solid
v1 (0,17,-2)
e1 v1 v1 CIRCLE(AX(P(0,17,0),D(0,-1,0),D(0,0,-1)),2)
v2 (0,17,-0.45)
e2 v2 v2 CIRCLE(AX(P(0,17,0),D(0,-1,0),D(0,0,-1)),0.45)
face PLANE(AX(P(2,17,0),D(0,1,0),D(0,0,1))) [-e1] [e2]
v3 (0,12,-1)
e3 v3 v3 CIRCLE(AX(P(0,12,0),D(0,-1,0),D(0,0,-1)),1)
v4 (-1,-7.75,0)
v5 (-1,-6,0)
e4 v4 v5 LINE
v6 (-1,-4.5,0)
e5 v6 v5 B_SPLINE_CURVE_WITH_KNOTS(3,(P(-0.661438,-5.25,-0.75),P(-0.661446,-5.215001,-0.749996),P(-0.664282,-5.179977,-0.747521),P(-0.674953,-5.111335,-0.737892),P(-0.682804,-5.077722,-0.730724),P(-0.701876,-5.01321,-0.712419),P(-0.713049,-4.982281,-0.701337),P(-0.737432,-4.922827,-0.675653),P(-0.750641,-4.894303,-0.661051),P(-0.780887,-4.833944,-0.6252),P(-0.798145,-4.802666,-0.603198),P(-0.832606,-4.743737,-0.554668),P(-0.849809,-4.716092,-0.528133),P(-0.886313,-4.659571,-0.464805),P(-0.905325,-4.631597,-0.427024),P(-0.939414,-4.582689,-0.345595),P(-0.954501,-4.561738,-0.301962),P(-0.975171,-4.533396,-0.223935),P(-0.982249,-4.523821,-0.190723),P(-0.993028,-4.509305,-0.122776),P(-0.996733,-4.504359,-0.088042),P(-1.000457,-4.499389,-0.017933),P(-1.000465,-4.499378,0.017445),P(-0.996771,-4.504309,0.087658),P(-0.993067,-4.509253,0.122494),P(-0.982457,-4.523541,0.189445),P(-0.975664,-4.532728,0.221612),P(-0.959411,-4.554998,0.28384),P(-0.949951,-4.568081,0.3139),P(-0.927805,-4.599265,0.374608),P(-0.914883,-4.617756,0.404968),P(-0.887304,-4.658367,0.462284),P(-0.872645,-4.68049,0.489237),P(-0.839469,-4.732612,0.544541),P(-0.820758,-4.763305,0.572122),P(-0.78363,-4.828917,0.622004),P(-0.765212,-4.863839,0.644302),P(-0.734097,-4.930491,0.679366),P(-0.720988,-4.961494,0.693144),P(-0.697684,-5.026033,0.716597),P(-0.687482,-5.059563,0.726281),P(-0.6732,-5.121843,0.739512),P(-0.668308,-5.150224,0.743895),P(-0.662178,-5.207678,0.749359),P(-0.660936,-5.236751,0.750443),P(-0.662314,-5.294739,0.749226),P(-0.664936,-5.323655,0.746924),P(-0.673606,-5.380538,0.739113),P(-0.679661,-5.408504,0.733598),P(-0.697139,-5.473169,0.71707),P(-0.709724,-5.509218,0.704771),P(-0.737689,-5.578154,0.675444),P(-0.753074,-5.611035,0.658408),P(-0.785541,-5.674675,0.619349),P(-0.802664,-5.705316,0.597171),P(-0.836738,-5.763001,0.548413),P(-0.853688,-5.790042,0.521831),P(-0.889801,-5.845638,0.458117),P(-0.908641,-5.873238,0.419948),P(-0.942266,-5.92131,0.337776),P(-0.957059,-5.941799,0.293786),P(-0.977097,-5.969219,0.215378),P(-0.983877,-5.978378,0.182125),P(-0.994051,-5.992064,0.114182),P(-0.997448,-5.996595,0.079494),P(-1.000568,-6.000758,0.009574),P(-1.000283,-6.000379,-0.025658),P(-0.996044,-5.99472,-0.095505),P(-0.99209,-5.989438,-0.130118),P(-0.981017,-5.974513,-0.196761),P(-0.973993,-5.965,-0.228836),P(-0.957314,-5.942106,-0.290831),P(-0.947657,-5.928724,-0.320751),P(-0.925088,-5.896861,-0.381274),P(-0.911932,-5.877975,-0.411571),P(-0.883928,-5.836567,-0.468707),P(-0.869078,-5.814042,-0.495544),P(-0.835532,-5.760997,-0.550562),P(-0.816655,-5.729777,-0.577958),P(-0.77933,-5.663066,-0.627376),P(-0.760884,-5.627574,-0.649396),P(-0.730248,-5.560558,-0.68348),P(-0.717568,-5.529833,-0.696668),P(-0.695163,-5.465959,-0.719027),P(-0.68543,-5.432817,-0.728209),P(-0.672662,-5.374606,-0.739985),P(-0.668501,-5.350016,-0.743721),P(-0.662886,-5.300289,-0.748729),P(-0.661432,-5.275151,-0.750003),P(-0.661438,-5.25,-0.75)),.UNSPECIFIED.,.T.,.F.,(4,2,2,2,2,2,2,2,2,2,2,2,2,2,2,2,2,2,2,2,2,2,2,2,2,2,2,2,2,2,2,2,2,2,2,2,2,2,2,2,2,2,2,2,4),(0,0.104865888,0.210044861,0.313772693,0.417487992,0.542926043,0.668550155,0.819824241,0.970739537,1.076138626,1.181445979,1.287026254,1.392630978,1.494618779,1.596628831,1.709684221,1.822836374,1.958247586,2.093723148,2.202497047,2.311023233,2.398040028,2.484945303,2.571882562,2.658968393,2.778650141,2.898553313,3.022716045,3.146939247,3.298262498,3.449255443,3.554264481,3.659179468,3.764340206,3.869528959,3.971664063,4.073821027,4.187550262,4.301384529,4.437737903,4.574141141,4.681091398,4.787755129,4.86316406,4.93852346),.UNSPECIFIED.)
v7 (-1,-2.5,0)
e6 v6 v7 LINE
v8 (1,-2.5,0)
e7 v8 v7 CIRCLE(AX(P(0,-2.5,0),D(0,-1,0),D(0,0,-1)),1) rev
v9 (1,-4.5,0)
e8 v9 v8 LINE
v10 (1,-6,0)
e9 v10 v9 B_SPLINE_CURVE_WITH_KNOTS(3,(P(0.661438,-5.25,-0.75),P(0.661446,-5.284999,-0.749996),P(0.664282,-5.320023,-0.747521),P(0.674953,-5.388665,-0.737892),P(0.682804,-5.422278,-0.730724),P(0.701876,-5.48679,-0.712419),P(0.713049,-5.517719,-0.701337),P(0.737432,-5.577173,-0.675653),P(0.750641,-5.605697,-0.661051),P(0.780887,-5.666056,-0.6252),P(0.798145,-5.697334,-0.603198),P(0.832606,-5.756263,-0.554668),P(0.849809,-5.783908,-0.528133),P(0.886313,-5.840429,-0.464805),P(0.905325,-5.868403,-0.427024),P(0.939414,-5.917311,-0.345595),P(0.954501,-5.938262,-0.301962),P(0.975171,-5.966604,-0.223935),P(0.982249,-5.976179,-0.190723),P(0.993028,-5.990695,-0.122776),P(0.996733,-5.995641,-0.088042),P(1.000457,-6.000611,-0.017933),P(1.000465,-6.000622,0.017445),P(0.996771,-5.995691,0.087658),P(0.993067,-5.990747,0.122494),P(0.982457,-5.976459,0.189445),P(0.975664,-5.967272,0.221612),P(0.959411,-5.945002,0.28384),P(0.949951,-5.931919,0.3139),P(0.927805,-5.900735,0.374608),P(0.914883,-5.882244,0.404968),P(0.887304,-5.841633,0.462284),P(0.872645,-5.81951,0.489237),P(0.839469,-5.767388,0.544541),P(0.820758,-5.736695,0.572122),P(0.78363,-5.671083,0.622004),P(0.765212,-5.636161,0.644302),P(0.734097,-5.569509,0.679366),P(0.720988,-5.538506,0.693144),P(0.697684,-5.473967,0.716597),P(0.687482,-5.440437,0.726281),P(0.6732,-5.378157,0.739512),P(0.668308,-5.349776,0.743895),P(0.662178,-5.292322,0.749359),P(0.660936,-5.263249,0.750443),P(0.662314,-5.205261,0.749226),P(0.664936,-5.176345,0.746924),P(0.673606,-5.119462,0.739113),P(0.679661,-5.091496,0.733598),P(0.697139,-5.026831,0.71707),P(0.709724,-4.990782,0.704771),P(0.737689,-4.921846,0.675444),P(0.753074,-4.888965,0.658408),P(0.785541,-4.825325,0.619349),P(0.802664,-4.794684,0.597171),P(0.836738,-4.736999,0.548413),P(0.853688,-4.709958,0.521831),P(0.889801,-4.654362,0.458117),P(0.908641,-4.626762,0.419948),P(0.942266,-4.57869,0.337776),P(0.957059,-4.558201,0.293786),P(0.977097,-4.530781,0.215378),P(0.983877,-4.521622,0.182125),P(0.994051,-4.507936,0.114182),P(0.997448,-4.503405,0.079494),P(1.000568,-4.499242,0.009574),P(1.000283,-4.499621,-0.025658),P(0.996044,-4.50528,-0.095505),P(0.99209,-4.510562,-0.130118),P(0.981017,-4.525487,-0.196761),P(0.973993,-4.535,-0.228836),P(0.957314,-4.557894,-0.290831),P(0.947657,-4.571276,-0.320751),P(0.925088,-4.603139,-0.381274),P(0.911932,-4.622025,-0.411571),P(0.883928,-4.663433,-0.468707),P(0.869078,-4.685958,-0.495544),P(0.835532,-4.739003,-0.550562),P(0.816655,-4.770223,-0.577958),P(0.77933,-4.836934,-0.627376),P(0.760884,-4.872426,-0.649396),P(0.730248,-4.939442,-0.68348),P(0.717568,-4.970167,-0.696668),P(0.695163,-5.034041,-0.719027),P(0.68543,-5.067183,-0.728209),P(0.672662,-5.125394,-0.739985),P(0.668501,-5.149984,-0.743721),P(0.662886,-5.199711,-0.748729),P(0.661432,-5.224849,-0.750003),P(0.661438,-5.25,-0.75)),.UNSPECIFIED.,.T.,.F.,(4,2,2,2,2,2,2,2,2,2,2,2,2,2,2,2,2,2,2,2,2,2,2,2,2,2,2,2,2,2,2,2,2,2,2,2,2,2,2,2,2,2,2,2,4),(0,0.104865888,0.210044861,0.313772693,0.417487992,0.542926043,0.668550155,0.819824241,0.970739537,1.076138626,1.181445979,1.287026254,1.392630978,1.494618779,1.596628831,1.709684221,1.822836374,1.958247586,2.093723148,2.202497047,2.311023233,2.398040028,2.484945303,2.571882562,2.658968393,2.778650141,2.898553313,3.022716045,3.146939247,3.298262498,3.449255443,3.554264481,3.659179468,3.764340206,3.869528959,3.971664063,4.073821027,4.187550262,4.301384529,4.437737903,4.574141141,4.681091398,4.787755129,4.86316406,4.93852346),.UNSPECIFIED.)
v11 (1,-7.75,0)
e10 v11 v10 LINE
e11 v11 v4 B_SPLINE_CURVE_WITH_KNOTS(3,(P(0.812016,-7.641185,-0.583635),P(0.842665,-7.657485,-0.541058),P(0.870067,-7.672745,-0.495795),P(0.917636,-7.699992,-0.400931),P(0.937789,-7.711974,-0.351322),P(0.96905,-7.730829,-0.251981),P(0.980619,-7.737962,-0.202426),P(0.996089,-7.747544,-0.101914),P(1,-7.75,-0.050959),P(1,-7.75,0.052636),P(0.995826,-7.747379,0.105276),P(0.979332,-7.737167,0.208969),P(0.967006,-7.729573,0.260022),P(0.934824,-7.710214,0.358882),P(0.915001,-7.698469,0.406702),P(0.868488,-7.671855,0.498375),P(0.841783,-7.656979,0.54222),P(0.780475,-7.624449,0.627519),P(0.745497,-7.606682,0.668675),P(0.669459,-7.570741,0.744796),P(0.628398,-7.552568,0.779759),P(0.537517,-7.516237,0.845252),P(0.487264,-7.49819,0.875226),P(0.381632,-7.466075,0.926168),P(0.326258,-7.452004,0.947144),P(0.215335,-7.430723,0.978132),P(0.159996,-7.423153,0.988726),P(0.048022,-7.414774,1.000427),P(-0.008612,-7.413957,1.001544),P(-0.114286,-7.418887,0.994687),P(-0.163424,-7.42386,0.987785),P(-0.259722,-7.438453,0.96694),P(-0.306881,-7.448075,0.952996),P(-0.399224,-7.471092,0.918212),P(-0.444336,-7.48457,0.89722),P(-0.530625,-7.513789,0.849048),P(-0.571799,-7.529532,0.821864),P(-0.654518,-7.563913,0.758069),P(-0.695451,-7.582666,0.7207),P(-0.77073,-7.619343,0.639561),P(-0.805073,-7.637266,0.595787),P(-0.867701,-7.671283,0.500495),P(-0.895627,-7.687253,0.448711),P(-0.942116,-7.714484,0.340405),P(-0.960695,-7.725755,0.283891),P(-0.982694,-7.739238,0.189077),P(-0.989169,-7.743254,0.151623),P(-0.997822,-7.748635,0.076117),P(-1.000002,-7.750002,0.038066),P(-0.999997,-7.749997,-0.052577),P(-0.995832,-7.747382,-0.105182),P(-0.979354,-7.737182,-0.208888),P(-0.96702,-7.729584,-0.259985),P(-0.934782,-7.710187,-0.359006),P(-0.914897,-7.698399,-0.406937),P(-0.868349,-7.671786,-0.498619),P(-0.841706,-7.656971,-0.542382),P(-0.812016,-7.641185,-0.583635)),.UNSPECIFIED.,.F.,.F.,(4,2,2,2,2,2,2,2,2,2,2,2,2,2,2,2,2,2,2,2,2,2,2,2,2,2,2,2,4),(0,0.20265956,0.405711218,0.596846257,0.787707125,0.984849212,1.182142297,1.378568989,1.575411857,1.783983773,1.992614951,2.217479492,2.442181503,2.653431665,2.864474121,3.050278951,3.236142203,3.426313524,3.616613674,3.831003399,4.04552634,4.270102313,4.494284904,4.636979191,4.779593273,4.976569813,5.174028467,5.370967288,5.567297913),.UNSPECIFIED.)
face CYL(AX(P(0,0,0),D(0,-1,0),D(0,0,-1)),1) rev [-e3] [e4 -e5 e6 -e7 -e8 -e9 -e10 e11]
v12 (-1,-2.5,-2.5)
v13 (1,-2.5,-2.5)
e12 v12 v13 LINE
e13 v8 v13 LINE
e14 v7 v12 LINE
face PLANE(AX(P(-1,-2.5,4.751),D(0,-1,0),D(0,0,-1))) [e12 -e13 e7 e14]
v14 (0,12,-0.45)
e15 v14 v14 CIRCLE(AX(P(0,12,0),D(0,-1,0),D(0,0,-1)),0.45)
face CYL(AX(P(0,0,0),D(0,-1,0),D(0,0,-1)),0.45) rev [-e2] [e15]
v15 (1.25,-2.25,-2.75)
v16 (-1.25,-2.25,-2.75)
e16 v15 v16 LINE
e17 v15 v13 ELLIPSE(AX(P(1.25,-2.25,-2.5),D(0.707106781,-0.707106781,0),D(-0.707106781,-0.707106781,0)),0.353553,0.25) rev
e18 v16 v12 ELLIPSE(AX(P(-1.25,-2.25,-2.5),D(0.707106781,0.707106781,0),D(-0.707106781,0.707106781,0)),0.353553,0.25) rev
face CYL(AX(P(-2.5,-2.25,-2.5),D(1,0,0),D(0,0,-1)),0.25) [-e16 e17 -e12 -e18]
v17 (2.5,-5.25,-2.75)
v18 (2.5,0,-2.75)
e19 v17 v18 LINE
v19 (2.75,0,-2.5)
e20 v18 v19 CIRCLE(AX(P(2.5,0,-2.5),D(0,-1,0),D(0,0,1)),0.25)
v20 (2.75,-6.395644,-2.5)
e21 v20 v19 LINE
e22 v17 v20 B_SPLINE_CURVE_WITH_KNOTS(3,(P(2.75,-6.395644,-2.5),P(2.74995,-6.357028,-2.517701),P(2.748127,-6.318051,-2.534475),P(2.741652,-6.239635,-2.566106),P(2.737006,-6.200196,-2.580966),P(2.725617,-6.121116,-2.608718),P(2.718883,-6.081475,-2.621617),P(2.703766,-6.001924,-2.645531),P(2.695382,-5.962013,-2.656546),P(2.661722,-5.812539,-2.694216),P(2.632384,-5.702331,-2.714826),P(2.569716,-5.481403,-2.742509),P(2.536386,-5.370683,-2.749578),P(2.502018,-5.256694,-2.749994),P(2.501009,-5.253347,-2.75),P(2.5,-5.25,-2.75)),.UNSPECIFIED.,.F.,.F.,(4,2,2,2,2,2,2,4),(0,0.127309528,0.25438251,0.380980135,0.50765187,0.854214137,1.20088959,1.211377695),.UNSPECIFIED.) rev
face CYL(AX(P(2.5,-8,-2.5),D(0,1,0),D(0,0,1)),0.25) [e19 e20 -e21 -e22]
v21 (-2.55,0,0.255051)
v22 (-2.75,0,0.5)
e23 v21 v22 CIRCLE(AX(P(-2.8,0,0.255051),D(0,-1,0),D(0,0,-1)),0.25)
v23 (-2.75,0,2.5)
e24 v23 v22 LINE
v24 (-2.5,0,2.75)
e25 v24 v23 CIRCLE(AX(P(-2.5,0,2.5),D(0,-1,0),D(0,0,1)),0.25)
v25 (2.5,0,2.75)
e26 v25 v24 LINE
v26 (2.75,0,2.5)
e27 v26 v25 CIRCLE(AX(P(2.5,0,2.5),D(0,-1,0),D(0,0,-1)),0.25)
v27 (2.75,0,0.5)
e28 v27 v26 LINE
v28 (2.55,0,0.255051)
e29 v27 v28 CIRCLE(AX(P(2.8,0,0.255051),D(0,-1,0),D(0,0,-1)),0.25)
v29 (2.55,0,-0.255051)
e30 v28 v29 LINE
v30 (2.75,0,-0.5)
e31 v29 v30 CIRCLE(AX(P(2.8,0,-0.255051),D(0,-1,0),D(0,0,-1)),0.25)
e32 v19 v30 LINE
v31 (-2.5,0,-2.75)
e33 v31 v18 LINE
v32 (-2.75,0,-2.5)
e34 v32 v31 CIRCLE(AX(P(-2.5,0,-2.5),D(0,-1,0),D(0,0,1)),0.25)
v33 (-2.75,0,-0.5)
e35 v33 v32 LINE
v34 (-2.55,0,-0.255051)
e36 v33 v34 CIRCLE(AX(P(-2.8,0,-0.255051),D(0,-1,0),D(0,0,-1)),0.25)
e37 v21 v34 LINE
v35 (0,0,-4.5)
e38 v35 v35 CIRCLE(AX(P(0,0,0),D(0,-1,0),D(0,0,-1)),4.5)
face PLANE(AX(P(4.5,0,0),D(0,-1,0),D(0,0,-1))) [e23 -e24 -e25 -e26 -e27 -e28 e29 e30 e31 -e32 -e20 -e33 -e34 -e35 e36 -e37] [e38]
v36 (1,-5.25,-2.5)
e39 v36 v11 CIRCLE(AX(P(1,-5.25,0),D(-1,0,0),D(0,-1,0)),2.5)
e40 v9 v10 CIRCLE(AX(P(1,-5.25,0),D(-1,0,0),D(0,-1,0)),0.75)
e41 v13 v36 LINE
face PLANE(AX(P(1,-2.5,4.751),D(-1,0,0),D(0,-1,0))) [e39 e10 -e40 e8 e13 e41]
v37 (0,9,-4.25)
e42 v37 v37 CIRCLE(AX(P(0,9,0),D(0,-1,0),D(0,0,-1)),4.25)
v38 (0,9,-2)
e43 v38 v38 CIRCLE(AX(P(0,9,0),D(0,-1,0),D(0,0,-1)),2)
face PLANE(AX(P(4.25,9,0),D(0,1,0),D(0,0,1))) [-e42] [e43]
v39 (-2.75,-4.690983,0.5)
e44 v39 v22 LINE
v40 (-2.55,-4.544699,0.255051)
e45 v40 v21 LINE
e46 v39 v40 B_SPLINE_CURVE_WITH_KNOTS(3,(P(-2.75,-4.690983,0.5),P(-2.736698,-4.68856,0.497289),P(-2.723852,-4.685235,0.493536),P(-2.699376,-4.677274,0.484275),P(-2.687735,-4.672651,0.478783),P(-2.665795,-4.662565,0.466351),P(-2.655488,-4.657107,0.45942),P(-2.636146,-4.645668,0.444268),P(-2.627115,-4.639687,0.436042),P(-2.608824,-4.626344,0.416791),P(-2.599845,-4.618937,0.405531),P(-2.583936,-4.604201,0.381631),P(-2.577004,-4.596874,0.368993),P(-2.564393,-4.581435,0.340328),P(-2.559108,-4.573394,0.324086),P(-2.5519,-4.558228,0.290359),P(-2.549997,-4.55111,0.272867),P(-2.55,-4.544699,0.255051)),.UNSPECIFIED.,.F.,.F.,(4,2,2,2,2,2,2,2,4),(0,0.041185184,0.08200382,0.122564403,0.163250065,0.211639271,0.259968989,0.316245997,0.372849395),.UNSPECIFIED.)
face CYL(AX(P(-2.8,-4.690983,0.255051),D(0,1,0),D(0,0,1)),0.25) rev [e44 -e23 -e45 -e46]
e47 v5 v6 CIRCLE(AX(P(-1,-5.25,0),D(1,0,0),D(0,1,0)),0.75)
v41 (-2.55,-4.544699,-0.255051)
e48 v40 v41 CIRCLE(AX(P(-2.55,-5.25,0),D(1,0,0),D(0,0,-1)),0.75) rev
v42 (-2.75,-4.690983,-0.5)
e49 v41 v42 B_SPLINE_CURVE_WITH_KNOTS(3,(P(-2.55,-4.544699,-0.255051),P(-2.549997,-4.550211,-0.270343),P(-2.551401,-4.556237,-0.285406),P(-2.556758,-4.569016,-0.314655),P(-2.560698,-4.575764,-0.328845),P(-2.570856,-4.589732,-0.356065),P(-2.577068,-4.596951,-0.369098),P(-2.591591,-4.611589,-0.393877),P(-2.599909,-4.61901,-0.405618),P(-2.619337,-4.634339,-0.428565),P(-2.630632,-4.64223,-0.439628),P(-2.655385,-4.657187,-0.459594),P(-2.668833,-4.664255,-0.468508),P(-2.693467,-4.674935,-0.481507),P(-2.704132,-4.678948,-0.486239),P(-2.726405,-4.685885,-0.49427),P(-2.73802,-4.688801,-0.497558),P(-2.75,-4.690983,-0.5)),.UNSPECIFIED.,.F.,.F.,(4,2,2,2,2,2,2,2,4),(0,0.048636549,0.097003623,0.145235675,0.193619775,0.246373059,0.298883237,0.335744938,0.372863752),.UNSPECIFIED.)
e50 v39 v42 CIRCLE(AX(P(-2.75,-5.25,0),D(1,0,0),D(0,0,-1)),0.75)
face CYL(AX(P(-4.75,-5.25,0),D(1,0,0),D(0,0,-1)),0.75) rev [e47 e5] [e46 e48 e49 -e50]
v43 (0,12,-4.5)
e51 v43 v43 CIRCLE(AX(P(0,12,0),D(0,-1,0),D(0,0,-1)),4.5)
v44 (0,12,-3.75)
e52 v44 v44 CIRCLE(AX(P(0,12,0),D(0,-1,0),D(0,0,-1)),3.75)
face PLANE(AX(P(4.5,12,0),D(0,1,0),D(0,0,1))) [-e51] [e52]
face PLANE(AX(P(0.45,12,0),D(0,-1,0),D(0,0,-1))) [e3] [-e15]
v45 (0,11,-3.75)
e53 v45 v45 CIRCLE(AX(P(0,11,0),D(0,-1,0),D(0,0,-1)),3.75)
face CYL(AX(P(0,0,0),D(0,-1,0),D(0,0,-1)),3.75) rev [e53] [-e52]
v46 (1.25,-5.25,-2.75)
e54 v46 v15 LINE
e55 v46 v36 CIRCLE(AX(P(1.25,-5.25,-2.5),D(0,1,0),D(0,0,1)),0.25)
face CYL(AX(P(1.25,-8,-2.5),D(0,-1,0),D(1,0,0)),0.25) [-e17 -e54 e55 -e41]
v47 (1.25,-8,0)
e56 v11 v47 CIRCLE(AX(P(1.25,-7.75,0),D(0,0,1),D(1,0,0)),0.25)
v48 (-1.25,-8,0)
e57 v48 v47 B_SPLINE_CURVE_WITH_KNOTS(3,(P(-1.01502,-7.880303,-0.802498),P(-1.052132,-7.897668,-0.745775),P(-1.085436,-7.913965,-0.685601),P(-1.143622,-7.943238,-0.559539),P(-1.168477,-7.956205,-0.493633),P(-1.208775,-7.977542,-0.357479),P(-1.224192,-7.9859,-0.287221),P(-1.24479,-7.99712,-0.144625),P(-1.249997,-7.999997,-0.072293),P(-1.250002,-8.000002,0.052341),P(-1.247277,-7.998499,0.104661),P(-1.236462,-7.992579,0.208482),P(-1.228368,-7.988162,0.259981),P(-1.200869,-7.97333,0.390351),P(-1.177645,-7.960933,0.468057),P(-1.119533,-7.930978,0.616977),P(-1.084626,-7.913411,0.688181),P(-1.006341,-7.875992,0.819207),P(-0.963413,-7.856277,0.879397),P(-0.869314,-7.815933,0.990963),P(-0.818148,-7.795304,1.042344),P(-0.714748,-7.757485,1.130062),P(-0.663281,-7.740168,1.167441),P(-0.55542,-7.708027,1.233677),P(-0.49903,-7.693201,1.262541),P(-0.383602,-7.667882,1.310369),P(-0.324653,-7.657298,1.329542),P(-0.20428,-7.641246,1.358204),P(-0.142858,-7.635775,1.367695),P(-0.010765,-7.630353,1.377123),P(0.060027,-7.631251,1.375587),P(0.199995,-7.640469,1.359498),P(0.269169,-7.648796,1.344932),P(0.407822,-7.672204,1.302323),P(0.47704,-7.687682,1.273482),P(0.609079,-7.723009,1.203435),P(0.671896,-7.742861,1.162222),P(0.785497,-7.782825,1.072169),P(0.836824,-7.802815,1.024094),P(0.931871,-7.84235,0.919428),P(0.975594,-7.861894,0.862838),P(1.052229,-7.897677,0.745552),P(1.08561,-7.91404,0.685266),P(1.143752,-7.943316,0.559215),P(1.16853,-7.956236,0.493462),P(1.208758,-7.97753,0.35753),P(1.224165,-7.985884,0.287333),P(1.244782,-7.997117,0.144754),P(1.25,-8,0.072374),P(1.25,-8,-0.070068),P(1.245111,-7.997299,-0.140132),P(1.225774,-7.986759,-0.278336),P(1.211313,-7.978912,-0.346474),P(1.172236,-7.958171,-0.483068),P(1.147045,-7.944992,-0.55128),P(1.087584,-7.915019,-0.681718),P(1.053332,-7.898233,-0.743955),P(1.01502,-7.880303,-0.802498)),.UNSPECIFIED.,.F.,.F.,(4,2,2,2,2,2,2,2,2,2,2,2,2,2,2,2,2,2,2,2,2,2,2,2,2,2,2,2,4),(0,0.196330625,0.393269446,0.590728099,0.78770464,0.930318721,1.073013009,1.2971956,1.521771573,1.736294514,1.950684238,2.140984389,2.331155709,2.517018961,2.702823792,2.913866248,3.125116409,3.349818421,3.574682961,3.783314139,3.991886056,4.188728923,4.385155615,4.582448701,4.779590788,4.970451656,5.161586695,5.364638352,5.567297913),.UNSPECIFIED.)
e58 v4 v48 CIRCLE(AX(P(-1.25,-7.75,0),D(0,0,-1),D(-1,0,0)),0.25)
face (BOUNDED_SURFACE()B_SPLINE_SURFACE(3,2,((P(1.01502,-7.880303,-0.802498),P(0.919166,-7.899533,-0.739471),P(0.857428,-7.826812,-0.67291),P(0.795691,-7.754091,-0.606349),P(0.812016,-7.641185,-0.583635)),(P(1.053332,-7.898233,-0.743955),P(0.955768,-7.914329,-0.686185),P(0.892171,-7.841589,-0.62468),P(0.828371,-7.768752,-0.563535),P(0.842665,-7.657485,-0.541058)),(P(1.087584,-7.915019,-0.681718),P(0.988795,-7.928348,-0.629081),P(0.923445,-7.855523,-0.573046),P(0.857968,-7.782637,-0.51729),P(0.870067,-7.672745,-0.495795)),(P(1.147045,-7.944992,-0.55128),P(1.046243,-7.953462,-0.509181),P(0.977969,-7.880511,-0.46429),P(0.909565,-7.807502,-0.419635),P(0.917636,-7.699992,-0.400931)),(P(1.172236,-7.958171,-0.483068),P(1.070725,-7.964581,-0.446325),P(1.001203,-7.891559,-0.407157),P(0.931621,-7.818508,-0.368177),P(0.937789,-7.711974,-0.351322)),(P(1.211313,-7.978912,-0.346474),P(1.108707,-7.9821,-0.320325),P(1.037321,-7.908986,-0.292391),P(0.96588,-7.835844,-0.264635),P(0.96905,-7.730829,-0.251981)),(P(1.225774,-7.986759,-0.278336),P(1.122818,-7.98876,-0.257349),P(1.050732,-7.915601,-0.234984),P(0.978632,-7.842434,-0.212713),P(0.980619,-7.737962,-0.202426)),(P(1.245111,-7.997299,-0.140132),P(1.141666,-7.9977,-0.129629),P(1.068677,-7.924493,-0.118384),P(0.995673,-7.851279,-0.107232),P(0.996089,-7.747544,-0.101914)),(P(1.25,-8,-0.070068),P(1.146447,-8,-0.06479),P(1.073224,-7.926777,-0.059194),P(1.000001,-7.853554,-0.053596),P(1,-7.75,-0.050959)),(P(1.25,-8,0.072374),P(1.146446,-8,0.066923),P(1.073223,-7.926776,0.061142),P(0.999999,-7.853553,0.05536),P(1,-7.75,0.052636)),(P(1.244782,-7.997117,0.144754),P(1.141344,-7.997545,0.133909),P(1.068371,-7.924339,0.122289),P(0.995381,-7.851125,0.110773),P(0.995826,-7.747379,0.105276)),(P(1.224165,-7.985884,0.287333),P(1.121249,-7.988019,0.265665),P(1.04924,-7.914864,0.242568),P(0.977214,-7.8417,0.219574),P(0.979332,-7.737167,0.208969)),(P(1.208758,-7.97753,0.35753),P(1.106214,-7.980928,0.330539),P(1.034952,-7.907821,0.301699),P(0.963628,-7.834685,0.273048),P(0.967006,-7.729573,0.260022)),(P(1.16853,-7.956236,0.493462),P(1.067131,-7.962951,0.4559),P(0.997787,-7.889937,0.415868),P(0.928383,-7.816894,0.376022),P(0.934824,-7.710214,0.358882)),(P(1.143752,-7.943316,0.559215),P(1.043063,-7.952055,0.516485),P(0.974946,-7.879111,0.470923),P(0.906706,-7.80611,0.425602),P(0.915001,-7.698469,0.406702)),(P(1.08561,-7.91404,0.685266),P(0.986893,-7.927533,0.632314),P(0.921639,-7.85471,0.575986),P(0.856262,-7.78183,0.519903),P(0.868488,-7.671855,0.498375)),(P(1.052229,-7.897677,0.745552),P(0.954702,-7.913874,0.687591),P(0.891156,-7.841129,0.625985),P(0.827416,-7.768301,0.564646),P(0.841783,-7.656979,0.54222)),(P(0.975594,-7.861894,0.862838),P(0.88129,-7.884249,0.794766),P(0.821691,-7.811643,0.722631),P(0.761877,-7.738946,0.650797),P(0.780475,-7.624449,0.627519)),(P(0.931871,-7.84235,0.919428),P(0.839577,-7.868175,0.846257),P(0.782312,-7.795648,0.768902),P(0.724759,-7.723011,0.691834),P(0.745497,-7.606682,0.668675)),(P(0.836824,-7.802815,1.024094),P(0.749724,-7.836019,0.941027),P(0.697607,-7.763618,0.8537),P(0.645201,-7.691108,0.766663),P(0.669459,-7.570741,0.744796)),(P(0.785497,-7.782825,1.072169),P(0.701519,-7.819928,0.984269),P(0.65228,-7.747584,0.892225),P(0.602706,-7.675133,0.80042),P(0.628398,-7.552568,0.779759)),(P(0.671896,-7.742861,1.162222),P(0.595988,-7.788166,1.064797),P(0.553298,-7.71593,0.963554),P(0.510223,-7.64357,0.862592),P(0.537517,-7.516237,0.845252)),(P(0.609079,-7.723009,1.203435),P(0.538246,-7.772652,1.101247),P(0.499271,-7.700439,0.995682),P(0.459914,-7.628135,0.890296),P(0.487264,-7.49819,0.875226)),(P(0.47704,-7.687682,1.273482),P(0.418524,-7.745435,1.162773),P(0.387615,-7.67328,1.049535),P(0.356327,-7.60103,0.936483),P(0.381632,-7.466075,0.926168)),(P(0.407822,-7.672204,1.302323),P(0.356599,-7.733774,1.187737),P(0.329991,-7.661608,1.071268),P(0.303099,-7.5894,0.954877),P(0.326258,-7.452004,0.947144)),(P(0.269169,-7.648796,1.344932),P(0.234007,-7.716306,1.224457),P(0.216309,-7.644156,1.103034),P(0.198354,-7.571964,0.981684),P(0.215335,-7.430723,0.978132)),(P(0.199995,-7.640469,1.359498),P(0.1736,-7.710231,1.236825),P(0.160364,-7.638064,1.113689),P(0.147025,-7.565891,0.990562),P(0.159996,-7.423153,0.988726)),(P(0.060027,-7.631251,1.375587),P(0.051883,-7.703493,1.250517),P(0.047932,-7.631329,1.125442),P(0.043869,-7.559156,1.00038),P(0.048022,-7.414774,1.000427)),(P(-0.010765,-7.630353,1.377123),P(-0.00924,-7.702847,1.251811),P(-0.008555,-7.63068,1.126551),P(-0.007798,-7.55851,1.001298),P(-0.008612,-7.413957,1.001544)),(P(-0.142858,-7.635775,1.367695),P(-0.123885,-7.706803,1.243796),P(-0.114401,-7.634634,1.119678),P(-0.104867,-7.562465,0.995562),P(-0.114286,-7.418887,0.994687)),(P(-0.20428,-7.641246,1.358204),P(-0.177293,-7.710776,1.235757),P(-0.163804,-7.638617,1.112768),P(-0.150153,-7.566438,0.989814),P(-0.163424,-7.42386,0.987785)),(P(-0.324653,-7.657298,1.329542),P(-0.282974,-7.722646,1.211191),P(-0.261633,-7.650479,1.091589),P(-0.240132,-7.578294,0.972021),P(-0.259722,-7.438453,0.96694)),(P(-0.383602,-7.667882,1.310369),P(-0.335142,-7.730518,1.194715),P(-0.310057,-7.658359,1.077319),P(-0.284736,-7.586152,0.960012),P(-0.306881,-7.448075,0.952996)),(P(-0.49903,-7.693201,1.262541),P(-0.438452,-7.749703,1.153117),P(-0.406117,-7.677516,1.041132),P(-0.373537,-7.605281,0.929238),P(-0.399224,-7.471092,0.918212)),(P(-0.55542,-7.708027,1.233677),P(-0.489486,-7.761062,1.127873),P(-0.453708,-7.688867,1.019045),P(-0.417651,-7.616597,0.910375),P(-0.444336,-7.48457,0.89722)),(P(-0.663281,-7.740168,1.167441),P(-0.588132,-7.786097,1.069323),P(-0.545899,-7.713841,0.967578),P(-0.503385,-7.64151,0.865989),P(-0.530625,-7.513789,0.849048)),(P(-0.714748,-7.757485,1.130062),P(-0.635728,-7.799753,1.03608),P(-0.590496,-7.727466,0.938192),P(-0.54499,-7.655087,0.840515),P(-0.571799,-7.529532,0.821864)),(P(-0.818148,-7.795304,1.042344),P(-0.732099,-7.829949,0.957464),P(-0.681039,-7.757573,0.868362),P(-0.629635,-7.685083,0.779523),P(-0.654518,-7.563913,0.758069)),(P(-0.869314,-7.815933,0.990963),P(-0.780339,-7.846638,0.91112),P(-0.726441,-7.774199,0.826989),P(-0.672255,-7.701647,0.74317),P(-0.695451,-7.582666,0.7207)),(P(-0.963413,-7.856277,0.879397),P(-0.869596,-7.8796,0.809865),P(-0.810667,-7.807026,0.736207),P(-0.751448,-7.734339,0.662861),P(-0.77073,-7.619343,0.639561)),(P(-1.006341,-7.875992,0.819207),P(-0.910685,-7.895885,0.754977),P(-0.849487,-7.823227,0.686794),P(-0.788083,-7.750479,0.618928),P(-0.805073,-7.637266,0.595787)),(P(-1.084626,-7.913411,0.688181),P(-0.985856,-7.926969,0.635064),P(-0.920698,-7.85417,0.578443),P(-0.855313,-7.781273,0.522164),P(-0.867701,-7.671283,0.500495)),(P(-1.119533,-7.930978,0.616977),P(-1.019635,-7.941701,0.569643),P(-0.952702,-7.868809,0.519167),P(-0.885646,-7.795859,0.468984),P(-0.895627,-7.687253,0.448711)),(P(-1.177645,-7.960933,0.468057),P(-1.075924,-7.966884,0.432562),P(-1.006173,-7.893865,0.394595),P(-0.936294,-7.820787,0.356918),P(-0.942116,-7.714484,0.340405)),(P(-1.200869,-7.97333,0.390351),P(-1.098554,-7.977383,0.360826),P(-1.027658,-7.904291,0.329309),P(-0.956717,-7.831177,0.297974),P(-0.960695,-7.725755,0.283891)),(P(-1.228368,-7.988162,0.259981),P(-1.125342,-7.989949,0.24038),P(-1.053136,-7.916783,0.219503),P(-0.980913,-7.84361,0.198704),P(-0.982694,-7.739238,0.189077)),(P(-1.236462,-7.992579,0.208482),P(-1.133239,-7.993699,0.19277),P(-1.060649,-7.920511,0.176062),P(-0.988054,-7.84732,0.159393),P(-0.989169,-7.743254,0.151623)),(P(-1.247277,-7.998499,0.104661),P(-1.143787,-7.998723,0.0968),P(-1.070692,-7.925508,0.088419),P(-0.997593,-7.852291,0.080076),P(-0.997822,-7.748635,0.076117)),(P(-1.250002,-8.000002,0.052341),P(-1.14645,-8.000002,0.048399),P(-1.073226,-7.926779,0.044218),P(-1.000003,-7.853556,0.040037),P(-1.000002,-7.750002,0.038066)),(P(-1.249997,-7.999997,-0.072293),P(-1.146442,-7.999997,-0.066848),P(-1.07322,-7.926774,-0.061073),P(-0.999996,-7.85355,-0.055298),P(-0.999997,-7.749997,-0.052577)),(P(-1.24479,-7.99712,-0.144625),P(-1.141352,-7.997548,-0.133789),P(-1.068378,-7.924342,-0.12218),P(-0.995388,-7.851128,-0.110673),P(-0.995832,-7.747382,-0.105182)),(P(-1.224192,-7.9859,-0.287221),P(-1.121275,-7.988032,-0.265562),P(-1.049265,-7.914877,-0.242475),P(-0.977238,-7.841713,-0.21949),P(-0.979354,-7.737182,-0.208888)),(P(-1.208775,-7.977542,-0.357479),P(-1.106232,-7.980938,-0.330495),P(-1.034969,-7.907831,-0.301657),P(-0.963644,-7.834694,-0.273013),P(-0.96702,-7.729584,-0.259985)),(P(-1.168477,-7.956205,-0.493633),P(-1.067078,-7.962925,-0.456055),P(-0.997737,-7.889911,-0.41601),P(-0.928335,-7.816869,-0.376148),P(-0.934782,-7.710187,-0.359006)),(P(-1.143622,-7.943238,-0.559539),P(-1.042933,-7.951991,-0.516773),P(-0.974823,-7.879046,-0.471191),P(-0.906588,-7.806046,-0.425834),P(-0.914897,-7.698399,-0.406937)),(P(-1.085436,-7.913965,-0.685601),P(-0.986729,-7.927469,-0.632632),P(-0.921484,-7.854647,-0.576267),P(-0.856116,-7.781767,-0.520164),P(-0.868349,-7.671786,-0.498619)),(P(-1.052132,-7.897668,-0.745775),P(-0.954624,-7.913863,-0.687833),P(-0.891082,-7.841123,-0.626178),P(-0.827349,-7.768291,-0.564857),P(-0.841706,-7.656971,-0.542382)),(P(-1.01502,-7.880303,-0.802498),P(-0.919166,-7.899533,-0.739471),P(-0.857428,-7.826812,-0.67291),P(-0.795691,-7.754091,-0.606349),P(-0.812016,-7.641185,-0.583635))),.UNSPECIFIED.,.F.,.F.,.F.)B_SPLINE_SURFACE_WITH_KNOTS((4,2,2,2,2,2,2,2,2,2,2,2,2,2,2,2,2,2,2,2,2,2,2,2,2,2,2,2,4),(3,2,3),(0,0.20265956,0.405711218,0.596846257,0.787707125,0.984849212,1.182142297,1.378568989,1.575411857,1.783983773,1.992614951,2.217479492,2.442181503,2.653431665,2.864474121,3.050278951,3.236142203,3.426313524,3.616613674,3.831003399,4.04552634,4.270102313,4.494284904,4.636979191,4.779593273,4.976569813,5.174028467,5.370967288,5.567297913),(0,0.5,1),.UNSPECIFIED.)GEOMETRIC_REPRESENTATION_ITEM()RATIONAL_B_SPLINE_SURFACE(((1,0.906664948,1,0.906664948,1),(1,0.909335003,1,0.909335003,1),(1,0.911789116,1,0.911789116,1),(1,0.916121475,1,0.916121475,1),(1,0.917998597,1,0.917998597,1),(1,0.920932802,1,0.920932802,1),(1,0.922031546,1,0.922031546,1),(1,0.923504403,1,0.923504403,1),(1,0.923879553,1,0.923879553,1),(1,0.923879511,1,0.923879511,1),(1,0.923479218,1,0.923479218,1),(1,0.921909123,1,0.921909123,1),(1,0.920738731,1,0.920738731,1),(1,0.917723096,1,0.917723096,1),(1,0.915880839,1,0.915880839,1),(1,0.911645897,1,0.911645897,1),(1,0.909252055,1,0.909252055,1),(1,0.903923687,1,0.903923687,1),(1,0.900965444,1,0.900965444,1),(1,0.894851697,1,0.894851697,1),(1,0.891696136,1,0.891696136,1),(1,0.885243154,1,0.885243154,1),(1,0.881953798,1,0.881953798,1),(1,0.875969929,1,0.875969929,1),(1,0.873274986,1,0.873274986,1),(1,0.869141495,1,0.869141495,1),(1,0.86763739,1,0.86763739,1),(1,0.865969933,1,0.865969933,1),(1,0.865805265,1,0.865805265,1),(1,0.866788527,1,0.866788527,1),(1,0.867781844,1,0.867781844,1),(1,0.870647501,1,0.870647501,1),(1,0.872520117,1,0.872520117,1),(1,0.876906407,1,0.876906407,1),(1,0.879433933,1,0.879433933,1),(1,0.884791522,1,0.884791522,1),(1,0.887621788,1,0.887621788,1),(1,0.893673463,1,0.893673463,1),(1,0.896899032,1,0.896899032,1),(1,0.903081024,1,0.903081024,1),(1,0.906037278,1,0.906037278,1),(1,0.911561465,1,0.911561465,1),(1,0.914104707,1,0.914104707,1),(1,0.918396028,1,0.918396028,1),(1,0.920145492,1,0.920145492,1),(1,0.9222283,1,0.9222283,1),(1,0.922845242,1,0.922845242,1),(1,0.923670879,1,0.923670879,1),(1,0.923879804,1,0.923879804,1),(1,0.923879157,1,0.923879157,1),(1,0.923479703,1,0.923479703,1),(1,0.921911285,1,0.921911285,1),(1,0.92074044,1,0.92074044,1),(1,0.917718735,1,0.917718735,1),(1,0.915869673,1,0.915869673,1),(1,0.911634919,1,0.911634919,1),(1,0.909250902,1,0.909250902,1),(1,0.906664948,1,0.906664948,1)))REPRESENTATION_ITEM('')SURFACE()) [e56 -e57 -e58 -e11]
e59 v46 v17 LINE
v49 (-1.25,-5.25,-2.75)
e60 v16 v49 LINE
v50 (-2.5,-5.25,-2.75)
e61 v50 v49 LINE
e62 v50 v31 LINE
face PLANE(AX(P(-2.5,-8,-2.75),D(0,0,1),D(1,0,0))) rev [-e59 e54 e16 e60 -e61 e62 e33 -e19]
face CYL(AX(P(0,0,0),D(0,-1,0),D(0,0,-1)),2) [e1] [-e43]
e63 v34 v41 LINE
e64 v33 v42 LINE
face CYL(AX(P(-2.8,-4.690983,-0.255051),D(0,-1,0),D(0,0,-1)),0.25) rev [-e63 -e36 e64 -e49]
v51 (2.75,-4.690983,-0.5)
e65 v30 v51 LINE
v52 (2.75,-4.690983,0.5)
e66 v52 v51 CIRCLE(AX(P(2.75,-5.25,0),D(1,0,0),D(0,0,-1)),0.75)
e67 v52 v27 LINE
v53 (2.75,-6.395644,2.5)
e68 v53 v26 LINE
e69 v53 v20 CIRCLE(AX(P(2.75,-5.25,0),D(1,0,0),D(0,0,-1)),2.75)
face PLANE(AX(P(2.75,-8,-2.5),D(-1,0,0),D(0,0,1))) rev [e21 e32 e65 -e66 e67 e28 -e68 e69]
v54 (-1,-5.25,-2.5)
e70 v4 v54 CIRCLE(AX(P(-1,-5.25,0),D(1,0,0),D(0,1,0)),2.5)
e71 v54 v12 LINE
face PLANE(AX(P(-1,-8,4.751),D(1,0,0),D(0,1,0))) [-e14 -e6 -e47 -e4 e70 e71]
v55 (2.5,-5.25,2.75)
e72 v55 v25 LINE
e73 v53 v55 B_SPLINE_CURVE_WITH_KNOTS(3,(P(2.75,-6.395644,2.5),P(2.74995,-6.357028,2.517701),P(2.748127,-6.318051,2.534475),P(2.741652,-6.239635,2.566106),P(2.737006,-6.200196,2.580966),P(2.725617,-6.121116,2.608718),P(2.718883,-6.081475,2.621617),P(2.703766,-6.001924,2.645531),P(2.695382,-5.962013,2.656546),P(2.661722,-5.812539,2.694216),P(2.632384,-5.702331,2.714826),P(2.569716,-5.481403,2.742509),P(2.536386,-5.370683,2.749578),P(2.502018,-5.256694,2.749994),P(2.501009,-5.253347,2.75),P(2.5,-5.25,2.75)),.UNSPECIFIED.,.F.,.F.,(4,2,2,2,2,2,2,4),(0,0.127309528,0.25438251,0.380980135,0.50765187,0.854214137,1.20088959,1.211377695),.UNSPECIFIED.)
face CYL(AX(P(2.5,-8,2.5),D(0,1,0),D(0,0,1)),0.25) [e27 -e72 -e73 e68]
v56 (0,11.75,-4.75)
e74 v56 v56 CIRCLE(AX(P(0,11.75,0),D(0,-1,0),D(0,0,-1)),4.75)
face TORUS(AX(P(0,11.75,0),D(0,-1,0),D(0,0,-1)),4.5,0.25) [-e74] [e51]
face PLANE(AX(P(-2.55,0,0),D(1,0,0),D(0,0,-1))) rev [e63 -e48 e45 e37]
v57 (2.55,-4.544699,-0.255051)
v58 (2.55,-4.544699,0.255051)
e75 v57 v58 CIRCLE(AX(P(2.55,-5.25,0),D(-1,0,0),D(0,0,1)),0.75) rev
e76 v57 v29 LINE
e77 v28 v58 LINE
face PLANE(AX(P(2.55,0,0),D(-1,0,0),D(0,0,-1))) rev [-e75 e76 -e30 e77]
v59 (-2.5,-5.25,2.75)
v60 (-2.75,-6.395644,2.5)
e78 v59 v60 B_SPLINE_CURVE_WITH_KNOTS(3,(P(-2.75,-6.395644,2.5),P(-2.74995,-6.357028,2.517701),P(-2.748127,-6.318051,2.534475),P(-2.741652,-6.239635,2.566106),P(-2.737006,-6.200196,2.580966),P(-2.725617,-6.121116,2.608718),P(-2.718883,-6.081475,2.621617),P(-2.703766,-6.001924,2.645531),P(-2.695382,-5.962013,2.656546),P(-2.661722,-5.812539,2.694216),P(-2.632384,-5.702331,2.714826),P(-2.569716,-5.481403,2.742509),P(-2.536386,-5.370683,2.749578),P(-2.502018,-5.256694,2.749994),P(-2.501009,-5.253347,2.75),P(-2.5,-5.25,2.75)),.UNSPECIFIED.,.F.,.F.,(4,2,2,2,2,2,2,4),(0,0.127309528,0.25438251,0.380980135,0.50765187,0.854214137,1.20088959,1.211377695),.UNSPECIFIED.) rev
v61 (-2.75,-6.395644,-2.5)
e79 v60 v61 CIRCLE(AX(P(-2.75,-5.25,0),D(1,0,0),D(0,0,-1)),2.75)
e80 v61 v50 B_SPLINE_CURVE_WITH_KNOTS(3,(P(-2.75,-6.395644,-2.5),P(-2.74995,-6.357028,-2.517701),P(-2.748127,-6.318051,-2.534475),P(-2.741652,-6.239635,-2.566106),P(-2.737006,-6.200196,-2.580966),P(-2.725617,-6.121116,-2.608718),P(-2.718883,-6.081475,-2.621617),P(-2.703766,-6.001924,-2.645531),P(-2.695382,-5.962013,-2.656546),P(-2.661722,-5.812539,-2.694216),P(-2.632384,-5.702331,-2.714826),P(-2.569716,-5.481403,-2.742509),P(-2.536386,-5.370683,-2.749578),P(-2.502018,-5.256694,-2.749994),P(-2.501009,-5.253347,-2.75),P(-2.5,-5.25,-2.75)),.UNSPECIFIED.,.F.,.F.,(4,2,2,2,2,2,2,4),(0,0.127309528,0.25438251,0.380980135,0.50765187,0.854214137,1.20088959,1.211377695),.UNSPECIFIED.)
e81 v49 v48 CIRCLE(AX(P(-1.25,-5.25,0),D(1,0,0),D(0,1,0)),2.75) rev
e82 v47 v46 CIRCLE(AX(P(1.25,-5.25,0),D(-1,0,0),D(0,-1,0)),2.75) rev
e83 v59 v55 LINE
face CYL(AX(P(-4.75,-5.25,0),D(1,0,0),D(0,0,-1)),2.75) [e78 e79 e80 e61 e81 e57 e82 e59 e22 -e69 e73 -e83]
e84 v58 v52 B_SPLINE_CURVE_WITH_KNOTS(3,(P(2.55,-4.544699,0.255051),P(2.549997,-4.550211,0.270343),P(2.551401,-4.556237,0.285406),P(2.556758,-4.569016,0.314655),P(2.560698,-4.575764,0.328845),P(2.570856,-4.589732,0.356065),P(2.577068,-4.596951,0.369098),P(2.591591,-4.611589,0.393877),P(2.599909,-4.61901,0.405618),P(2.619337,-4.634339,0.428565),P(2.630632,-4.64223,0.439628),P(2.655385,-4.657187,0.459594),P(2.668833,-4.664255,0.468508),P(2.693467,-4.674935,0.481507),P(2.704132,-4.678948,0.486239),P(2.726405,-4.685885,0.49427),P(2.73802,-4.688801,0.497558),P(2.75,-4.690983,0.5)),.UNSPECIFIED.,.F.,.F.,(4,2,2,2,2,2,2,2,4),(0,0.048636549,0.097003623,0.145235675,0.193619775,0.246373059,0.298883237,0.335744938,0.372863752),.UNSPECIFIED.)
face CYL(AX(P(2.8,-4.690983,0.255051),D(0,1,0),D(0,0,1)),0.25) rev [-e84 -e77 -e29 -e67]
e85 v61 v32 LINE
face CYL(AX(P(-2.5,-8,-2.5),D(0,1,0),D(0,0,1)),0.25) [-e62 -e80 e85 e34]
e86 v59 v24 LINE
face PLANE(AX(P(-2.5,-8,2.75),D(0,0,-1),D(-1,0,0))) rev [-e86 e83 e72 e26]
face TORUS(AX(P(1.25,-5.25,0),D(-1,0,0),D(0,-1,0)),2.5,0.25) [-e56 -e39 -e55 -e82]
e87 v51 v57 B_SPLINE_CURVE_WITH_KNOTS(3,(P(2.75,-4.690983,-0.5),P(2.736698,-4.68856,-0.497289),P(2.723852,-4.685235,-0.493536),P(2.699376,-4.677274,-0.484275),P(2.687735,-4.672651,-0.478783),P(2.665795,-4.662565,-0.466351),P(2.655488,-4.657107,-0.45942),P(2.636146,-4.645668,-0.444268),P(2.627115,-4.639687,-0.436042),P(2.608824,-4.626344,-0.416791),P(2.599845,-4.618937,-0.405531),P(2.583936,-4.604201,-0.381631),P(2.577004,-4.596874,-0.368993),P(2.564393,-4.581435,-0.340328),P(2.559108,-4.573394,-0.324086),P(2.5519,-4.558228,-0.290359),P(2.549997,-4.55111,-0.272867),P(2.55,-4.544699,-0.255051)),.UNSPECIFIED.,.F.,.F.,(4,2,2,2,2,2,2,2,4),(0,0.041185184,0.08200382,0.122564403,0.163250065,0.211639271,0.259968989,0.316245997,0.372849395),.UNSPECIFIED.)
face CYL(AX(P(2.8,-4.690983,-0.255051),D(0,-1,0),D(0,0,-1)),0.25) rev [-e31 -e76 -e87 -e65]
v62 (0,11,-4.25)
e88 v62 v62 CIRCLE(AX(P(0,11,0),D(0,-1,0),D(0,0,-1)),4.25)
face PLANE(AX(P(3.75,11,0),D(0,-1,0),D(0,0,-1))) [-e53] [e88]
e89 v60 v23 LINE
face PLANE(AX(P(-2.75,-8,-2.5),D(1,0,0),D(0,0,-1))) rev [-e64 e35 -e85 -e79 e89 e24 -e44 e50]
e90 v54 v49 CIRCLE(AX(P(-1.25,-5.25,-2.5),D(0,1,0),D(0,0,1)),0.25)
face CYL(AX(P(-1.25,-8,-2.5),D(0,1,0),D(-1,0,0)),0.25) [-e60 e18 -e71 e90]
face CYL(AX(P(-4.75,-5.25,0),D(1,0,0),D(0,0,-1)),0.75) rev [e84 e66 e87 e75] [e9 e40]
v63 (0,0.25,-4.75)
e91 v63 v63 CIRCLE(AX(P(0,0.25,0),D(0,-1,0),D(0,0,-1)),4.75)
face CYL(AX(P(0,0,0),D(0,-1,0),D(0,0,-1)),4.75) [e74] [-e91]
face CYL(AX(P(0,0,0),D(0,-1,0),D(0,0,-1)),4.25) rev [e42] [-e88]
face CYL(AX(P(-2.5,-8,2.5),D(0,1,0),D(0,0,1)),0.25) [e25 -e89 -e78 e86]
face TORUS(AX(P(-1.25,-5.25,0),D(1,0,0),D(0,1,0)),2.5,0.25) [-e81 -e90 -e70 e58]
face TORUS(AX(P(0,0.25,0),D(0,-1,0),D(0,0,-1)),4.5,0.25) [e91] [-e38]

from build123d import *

# Parameters (mm, degrees)
BOSS_EXTRU_2_START      = 8
ESQUISSE4_R             = 1
BOSS_EXTRU_2_DEPTH      = 8
ENL_V_MAT_EXTRU_1_DEPTH = 20.178438414
ENL_V_MAT_EXTRU_2_REACH = 21.178
ESQUISSE6_W             = 2
ESQUISSE6_H             = 5.5
CONG_1_R                = 0.25
ESQUISSE7_W             = 1
ESQUISSE7_H             = 4.690983006
ENL_V_MAT_EXTRU_3_DEPTH = 0.2
CONG_2_R                = 0.25
CONG_2_OF_SYM_TRIE1_R   = 0.25


with BuildPart() as part:
    # Esquisse1 → Révolution1 (revolve)
    with BuildSketch(Plane.XY, mode=Mode.PRIVATE) as r_volution1_sk:
        with BuildLine():
            Line((2, 9), (2, 17))
            Line((2, 17), (0.45, 17))
            Line((0.45, 17), (0.45, 12))
            Line((0.45, 12), (1, 12))
            Line((1, 12), (1, 0))
            Line((1, 0), (4.5, 0))
            ThreePointArc((4.5, 0), (4.676776695, 0.073223305), (4.75, 0.25))
            Line((4.75, 0.25), (4.75, 11.75))
            ThreePointArc((4.75, 11.75), (4.676776695, 11.926776695), (4.5, 12))
            Line((4.5, 12), (3.75, 12))
            Line((3.75, 12), (3.75, 11))
            Line((3.75, 11), (4.25, 11))
            Line((4.25, 11), (4.25, 9))
            Line((4.25, 9), (2, 9))
        make_face()
    revolve(r_volution1_sk.sketch.rotate(Axis((0, 0, 0), (0, 1, 0)), 90), axis=Axis((0, 0, 0), (0, 1, 0)))

    # Esquisse4 → Boss.-Extru.2 (add)
    with BuildSketch(Plane.XZ.offset(BOSS_EXTRU_2_START)):
        with BuildLine():
            Line((-2.5, -2.75), (2.5, -2.75))
            ThreePointArc((2.5, -2.75), (2.676776695, -2.676776695), (2.75, -2.5))
            Line((2.75, -2.5), (2.75, 2.5))
            ThreePointArc((2.75, 2.5), (2.676776695, 2.676776695), (2.5, 2.75))
            Line((2.5, 2.75), (-2.5, 2.75))
            ThreePointArc((-2.5, 2.75), (-2.676776695, 2.676776695), (-2.75, 2.5))
            Line((-2.75, 2.5), (-2.75, -2.5))
            ThreePointArc((-2.75, -2.5), (-2.676776695, -2.676776695), (-2.5, -2.75))
        make_face()
        with Locations(Location((0, 0, 0), (0, 0, 270))):
            Circle(ESQUISSE4_R, mode=Mode.SUBTRACT)
    extrude(amount=-BOSS_EXTRU_2_DEPTH)

    # Esquisse5 → Enlèv. mat.-Extru.1 (cut, through all)
    with BuildSketch(Plane(origin=(2.75, 0, 0), x_dir=(0, 0, -1), z_dir=(1, 0, 0))):
        with BuildLine():
            Line((-2.5, -8), (0, -8))
            ThreePointArc((0, -8), (-1.48525742, -7.564413618), (-2.5, -6.395643924))
            Line((-2.5, -6.395643924), (-2.5, -8))
        make_face()
        with BuildLine():
            Line((2.5, -8), (2.5, -6.395643924))
            ThreePointArc((2.5, -6.395643924), (1.48525742, -7.564413618), (0, -8))
            Line((0, -8), (2.5, -8))
        make_face()
        with BuildLine():
            Line((-2.75, -8), (-2.5, -8))
            Line((-2.5, -8), (-2.5, -6.395643924))
            ThreePointArc((-2.5, -6.395643924), (-2.686773158, -5.83630197), (-2.75, -5.25))
            Line((-2.75, -5.25), (-2.75, -8))
        make_face()
        with BuildLine():
            Line((2.75, -8), (2.75, -5.25))
            ThreePointArc((2.75, -5.25), (2.686773158, -5.83630197), (2.5, -6.395643924))
            Line((2.5, -6.395643924), (2.5, -8))
            Line((2.5, -8), (2.75, -8))
        make_face()
        with BuildLine():
            ThreePointArc((-0.75, -5.25), (0, -6), (0.75, -5.25))
            Line((0.75, -5.25), (-0.75, -5.25))
        make_face()
        with BuildLine():
            Line((-0.75, -5.25), (0.75, -5.25))
            ThreePointArc((0.75, -5.25), (0, -4.5), (-0.75, -5.25))
        make_face()
    extrude(amount=-ENL_V_MAT_EXTRU_1_DEPTH, mode=Mode.SUBTRACT)

    # Esquisse6 → Enlèv. mat.-Extru.2 (cut, up to next)
    with BuildSketch(Plane.XY.offset(-2.75), mode=Mode.PRIVATE) as enl_v_mat_extru_2_sk1:
        with Locations((0, -5.25)):
            Rectangle(ESQUISSE6_W, ESQUISSE6_H)
    enl_v_mat_extru_2_tool1 = extrude(enl_v_mat_extru_2_sk1.sketch, amount=ENL_V_MAT_EXTRU_2_REACH, mode=Mode.PRIVATE) & part.part
    add(enl_v_mat_extru_2_tool1.solids().sort_by_distance((0, -5.25, -2.75))[0], mode=Mode.SUBTRACT)

    # Congé1
    cong_1_edges = [part.edges().sort_by_distance(p)[0] for p in [
        (1, -7.194543649, -1.944543647),
        (-1, -7.194543648, -1.944543648),
        (-1, -3.875, -2.75),
        (0, -2.5, -2.75),
        (1, -3.875, -2.75),
        (0, -7.811737691, 1),
    ]]
    fillet(cong_1_edges, radius=CONG_1_R)

    # Esquisse7 → Enlèv. mat.-Extru.3 (cut)
    with BuildSketch(Plane.ZY.offset(2.75)):
        with Locations((0, -2.345491503)):
            Rectangle(ESQUISSE7_W, ESQUISSE7_H)
    enl_v_mat_extru_3 = extrude(amount=-ENL_V_MAT_EXTRU_3_DEPTH, mode=Mode.SUBTRACT)

    # Congé2
    # the kernel refuses this fillet: 0.25 mm, written as the material it adds along each edge
    with BuildSketch(Plane(origin=(-2.55, -5.303355441, 0.5), x_dir=(-1.0, 0, -1.569855356819468e-12), z_dir=(0, 1, 0))) as cong_2_piece_1_section:
        with BuildLine():
            CenterArc((0.25, -0.244948974), CONG_2_R, 101.536959033, 78.463040967)
            Line((0, -0.244948974), (-0.005, -0.244948974))
            Line((-0.005, -0.244948974), (-0.005, 0))
            Line((-0.005, 0), (0, 0.005))
            ThreePointArc((0, 0.005), (0.1, 0.005), (0.199, 0.004898979))
            Line((0.199, 0.004898979), (0.2, 0))
        make_face()
    cong_2_piece_1 = extrude(amount=5.915727877, mode=Mode.PRIVATE)
    cong_2_piece_1 = cong_2_piece_1 - Plane(origin=(-2.600107301, -5.25, 0), x_dir=(0, 0, 1), z_dir=(1, 0, 0)) * Cylinder(0.75, 13, mode=Mode.PRIVATE)
    add(cong_2_piece_1)
    with BuildSketch(Plane(origin=(-2.55, 0.612372436, -0.5), x_dir=(-1.0, 0, 1.569855356819468e-12), z_dir=(0, -1, 0))) as cong_2_piece_2_section:
        with BuildLine():
            CenterArc((0.25, -0.244948974), CONG_2_R, 101.536959033, 78.463040967)
            Line((0, -0.244948974), (-0.005, -0.244948974))
            Line((-0.005, -0.244948974), (-0.005, 0))
            Line((-0.005, 0), (0, 0.005))
            ThreePointArc((0, 0.005), (0.1, 0.005), (0.199, 0.004898979))
            Line((0.199, 0.004898979), (0.2, 0))
        make_face()
    cong_2_piece_2 = extrude(amount=5.915727877, mode=Mode.PRIVATE)
    cong_2_piece_2 = cong_2_piece_2 - Plane(origin=(-2.599890025, -5.25, 0), x_dir=(0, 0, 1), z_dir=(1, 0, 0)) * Cylinder(0.75, 13, mode=Mode.PRIVATE)
    add(cong_2_piece_2)

    # Symétrie1: Enlèv. mat.-Extru.3 across plane
    add(enl_v_mat_extru_3.mirror(Plane(origin=(0, 0, 0), x_dir=(0, 0, 1), z_dir=(1, 0, 0))), mode=Mode.SUBTRACT)

    # Congé2 of Symétrie1
    # the kernel refuses this fillet: 0.25 mm, written as the material it adds along each edge
    with BuildSketch(Plane(origin=(2.55, -5.303355441, 0.5), x_dir=(0, 0, -1), z_dir=(0, 1, 0))) as cong_2_of_sym_trie1_piece_1_section:
        with BuildLine():
            CenterArc((0.244948974, -0.25), CONG_2_OF_SYM_TRIE1_R, 90, 78.463040967)
            Line((0, -0.2), (-0.004898979, -0.199))
            ThreePointArc((-0.004898979, -0.199), (-0.005, -0.1), (-0.005, 0))
            Line((-0.005, 0), (0, 0.005))
            Line((0, 0.005), (0.244948974, 0.005))
            Line((0.244948974, 0.005), (0.244948974, 0))
        make_face()
    cong_2_of_sym_trie1_piece_1 = extrude(amount=5.915727877, mode=Mode.PRIVATE)
    cong_2_of_sym_trie1_piece_1 = cong_2_of_sym_trie1_piece_1 - Plane(origin=(2.600107302, -5.25, 0), x_dir=(0, 0, 1), z_dir=(1, 0, 0)) * Cylinder(0.75, 13, mode=Mode.PRIVATE)
    add(cong_2_of_sym_trie1_piece_1)
    with BuildSketch(Plane(origin=(2.55, 0.612372436, -0.5), x_dir=(1.0, 0, 1.569855356819468e-12), z_dir=(0, -1, 0))) as cong_2_of_sym_trie1_piece_2_section:
        with BuildLine():
            CenterArc((0.25, 0.244948974), CONG_2_OF_SYM_TRIE1_R, 180, 78.463040967)
            Line((0, 0.244948974), (-0.005, 0.244948974))
            Line((-0.005, 0.244948974), (-0.005, 0))
            Line((-0.005, 0), (0, -0.005))
            ThreePointArc((0, -0.005), (0.1, -0.005), (0.199, -0.004898979))
            Line((0.199, -0.004898979), (0.2, 0))
        make_face()
    cong_2_of_sym_trie1_piece_2 = extrude(amount=5.915727877, mode=Mode.PRIVATE)
    cong_2_of_sym_trie1_piece_2 = cong_2_of_sym_trie1_piece_2 - Plane(origin=(2.599890025, -5.25, 0), x_dir=(0, 0, 1), z_dir=(1, 0, 0)) * Cylinder(0.75, 13, mode=Mode.PRIVATE)
    add(cong_2_of_sym_trie1_piece_2)


solid = part.part
